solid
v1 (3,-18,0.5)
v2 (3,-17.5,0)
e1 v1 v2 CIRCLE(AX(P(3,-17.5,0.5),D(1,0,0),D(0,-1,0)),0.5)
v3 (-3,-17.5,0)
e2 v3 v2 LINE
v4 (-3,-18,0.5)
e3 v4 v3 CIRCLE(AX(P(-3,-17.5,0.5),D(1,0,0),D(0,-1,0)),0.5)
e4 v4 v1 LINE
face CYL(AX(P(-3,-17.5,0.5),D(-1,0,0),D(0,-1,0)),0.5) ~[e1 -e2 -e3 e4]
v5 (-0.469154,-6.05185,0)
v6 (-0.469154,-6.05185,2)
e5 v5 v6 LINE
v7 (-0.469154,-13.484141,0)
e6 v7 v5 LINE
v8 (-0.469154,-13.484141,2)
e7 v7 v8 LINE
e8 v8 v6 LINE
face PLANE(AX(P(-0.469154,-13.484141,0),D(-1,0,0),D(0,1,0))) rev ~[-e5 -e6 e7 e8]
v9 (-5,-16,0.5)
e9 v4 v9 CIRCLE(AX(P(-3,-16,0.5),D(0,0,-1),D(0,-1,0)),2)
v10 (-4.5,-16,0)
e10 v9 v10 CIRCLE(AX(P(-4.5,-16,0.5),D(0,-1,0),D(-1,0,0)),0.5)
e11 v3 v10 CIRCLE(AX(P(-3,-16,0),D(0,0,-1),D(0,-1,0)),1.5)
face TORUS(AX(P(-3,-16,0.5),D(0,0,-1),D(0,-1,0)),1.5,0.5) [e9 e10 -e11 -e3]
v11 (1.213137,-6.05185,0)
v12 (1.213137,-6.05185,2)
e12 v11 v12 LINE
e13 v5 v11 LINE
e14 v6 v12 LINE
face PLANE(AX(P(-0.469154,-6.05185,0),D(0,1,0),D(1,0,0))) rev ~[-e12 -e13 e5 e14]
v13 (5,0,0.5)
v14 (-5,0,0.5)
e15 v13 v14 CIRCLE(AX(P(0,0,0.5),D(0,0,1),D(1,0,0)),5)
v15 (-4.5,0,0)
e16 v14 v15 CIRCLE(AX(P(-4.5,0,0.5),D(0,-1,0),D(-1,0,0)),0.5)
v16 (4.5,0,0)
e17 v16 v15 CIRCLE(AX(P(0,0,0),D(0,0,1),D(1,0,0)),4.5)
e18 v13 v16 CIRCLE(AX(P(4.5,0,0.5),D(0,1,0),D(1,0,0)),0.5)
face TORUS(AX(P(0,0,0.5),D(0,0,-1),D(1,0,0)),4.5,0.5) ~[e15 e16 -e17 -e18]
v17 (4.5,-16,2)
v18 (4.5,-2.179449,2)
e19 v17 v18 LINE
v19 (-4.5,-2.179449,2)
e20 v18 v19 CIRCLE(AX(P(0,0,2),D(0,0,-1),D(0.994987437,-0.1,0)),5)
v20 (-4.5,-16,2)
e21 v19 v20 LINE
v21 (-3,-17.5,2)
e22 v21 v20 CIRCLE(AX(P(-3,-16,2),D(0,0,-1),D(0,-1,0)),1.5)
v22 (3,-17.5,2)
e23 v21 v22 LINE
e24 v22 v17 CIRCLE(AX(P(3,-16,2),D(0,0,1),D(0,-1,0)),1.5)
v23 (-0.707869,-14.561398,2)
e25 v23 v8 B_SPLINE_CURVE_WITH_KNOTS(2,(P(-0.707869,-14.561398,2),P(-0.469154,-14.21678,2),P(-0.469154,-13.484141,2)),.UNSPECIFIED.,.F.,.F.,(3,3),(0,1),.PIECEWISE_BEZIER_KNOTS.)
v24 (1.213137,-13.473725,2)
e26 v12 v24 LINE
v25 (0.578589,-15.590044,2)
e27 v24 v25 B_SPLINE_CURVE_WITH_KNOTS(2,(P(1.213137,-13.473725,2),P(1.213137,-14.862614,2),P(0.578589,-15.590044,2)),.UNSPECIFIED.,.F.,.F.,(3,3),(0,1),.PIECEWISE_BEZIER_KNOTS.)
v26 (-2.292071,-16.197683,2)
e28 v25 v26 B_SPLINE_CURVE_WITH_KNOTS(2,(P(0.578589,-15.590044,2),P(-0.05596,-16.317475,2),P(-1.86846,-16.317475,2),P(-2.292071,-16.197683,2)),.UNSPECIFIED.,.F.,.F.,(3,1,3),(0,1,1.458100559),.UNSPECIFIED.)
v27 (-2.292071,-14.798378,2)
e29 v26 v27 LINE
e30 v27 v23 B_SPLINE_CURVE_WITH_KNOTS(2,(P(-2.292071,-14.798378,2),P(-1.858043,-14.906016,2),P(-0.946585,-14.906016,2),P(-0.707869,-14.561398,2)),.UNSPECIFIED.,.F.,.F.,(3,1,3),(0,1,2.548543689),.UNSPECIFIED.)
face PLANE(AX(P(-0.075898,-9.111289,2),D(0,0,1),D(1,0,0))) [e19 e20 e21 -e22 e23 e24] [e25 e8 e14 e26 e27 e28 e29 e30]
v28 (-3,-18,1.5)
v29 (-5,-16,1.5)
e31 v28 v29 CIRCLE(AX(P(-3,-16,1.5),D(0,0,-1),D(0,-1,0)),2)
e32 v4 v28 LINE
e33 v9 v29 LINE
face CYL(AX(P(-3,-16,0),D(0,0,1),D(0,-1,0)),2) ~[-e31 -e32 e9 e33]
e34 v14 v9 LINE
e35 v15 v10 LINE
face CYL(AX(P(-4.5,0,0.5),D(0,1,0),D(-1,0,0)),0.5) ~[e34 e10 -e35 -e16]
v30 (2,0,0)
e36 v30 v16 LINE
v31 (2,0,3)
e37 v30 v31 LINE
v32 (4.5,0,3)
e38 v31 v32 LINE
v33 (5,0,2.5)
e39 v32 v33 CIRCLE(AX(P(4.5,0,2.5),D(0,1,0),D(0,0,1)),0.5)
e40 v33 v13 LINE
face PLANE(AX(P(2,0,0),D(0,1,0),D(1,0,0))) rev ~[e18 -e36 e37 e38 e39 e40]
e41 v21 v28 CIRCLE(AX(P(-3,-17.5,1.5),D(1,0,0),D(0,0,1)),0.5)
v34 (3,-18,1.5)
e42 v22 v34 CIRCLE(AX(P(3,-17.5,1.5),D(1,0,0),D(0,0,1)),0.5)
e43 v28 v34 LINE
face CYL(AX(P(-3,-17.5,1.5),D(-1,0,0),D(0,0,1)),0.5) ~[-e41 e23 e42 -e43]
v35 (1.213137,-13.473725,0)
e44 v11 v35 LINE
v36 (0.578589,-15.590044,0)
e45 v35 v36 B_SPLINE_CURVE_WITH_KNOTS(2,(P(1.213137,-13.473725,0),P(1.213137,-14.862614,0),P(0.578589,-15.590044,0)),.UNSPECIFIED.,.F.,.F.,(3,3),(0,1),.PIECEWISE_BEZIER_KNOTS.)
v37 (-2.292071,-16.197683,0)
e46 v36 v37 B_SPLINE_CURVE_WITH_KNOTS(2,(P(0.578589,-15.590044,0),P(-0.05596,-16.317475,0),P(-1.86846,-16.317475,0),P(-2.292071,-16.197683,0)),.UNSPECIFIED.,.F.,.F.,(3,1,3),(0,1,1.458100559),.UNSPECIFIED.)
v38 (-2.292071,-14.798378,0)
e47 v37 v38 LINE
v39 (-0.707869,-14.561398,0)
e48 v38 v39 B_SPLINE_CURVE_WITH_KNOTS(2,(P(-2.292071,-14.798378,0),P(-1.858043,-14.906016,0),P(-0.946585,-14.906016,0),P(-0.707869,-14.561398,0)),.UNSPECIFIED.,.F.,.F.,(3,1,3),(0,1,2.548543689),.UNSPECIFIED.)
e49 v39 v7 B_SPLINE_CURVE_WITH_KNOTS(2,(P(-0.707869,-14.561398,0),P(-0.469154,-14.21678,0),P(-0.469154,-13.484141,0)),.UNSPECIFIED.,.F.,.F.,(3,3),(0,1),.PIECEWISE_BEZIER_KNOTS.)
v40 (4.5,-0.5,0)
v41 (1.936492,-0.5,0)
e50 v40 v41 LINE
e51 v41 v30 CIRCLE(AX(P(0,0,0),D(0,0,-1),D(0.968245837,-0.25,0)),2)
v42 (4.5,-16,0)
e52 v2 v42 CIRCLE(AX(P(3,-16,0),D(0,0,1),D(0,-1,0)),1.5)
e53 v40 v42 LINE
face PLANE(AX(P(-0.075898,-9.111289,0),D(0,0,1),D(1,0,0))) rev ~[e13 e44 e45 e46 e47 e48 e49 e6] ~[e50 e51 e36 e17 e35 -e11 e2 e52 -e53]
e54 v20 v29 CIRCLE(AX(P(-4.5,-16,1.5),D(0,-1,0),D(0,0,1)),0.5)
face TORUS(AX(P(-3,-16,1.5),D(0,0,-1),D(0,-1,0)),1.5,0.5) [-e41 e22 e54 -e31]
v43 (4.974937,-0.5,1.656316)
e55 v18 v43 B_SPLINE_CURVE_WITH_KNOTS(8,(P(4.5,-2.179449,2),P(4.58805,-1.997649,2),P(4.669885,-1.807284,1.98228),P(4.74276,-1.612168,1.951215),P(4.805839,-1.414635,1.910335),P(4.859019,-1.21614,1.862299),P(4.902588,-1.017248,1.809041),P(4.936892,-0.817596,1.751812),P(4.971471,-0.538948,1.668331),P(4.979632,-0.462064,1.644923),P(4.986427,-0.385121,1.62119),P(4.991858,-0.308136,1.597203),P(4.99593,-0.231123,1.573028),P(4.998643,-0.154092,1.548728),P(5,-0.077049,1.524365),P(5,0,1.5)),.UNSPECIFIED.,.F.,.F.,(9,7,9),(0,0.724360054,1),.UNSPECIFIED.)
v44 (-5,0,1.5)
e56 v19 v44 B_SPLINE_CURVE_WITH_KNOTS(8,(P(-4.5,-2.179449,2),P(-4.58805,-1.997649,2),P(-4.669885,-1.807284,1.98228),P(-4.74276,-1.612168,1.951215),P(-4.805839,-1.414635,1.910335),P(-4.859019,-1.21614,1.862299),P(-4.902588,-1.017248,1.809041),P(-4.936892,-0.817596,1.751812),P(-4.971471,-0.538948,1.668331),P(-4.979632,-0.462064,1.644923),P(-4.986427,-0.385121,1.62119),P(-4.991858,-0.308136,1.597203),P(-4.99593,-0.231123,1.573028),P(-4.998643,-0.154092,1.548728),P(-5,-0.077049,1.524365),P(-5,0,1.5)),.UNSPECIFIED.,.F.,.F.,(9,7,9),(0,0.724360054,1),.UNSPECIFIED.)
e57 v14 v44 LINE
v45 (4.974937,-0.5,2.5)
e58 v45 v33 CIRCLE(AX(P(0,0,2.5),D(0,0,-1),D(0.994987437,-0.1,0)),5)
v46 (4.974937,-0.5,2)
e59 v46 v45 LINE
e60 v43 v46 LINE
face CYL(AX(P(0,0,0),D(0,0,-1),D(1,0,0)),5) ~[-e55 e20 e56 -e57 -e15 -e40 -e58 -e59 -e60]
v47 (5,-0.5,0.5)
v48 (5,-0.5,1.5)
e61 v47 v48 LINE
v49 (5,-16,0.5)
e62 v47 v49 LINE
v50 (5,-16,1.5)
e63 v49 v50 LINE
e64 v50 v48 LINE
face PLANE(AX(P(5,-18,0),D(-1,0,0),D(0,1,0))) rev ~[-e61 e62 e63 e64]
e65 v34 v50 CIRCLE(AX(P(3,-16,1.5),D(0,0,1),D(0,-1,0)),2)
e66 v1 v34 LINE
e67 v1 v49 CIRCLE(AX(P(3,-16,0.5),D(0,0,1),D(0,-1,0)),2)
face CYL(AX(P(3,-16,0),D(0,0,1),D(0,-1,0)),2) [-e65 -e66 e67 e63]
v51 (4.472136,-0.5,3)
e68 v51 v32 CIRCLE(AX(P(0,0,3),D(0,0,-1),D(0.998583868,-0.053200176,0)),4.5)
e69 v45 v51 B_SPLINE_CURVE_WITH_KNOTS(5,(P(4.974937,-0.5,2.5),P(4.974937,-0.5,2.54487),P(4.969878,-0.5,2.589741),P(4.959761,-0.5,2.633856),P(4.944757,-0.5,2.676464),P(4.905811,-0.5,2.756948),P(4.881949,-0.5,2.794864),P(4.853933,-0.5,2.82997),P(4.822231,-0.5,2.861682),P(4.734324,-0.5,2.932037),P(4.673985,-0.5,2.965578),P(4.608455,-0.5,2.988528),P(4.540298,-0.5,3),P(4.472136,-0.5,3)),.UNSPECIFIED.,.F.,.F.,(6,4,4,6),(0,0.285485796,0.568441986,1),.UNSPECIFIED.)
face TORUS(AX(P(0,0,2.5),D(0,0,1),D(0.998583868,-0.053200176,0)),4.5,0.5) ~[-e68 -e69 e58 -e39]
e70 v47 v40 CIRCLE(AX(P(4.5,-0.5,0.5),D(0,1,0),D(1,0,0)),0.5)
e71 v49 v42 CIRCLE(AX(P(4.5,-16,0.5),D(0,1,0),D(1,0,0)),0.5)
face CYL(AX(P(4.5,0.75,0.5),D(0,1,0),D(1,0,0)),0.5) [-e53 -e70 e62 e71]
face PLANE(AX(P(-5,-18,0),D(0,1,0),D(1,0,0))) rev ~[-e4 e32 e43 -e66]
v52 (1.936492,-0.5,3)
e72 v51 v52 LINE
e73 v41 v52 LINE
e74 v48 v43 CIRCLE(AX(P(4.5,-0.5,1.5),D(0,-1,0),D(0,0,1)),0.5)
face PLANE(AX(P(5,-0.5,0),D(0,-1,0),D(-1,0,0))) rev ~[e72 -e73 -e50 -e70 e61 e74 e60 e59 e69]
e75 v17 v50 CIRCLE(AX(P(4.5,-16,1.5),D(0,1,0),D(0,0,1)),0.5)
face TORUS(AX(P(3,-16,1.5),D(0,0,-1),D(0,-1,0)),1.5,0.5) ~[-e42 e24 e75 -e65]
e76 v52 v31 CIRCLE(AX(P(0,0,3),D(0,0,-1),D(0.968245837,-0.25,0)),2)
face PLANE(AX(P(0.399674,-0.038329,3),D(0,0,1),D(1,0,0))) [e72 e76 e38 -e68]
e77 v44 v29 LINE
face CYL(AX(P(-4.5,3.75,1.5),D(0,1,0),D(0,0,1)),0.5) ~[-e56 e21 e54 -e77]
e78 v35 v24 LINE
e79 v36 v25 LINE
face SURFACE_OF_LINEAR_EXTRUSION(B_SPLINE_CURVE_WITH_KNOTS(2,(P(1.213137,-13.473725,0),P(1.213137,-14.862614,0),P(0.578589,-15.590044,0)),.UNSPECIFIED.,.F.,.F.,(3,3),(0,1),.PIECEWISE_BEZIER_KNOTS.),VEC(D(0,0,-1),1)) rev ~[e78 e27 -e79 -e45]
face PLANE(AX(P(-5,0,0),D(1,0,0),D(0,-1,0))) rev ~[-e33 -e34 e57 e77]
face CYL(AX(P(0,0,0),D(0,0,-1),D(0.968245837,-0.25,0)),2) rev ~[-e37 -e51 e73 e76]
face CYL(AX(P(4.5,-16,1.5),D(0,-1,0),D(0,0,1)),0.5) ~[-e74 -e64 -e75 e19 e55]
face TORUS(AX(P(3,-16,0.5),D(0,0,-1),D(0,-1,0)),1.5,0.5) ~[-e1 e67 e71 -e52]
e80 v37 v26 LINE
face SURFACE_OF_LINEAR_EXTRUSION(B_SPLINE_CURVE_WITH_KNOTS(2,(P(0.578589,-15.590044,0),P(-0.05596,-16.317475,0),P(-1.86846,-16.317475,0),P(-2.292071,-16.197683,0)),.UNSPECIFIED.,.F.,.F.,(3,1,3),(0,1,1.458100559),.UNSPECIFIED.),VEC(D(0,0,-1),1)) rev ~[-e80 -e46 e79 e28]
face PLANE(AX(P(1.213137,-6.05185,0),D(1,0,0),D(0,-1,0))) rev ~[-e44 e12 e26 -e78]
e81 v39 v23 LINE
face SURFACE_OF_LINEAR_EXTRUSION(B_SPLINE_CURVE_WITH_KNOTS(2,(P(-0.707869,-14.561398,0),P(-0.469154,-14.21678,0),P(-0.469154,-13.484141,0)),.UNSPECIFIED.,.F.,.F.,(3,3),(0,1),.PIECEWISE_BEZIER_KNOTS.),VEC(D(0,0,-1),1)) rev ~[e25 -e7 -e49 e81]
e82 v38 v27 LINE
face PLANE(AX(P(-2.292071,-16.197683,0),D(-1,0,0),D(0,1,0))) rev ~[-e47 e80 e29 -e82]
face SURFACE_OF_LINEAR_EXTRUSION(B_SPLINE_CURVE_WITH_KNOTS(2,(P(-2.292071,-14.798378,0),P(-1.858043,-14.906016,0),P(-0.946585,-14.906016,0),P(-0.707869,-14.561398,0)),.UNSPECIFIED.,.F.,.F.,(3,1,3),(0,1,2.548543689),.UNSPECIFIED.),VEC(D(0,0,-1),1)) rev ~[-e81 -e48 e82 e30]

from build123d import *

# Parameters (mm, degrees)
F1_DEPTH     = 3
F2_DEPTH     = 2
F3_R         = 2
F4_T1_DEPTH  = 16.75
F4_T3_DEPTH  = 6
F4_T5_DEPTH  = 16
F4_T10_DEPTH = 16.75
F4_S11_R     = 5
F4_T12_DEPTH = 10
F4_T14_ANGLE = 359.64
F4_T18_DEPTH = 19.75
F4_S19_R     = 5
F4_T20_DEPTH = 11
F4_T22_ANGLE = 90
F4_T24_ANGLE = 90
F4_T26_ANGLE = 90
F4_T28_ANGLE = 180
F4_T30_ANGLE = 90


# Not quite as in the source:
# - a fillet or chamfer that OpenCascade refuses, or shapes differently, is made with other operations: its cross-section is extruded or revolved along the edge and cut away or added


with BuildPart() as f1:
    # F0 (on Top) → F1 (new body)
    with BuildSketch(Plane.XY):
        with BuildLine():
            Line((2, 0), (5, 0))
            ThreePointArc((5, 0), (0, 5), (-5, 0))
            ThreePointArc((-5, 0), (-0.2503138753, -4.9937303656), (4.9749371855, -0.5))
            Line((4.9749371855, -0.5), (1.9364916731, -0.5))
            ThreePointArc((1.9364916731, -0.5), (-1.9840593925, 0.252008585), (2, 0))
        make_face()
    extrude(amount=F1_DEPTH)

    # F0 (on Top) → F2 (join)
    with BuildSketch(Plane.XY):
        with BuildLine():
            ThreePointArc((4.9749371855, -0.5), (-0.2503138753, -4.9937303656), (-5, 0))
            Line((-5, 0), (-5, -18))
            Line((-5, -18), (5, -18))
            Line((5, -18), (5, -0.5))
            Line((5, -0.5), (4.9749371855, -0.5))
        make_face()
        with BuildLine():
            add(Edge.make_bspline(
                [(0.578588878, -15.5900442691), (-0.0559597331, -16.3174748247), (-1.2990152887, -16.3174748247)],
                knots=[0, 0, 0, 1, 1, 1], degree=2))
            add(Edge.make_bspline(
                [(-1.2990152887, -16.3174748247), (-1.8684597331, -16.3174748247), (-2.2920708442, -16.197683158)],
                knots=[0, 0, 0, 1, 1, 1], degree=2))
            Line((-2.2920708442, -16.197683158), (-2.2920708442, -14.7983776025))
            add(Edge.make_bspline(
                [(-2.2920708442, -14.7983776025), (-1.8580430665, -14.9060164914), (-1.5004041776, -14.9060164914)],
                knots=[0, 0, 0, 1, 1, 1], degree=2))
            add(Edge.make_bspline(
                [(-1.5004041776, -14.9060164914), (-0.9465847331, -14.9060164914), (-0.7078694553, -14.5613984358)],
                knots=[0, 0, 0, 1, 1, 1], degree=2))
            add(Edge.make_bspline(
                [(-0.7078694553, -14.5613984358), (-0.4691541776, -14.2167803802), (-0.4691541776, -13.4841414914)],
                knots=[0, 0, 0, 1, 1, 1], degree=2))
            Line((-0.4691541776, -13.4841414914), (-0.4691541776, -6.0518498247))
            Line((-0.4691541776, -6.0518498247), (1.2131374891, -6.0518498247))
            Line((1.2131374891, -6.0518498247), (1.2131374891, -13.4737248247))
            add(Edge.make_bspline(
                [(1.2131374891, -13.4737248247), (1.2131374891, -14.8626137136), (0.578588878, -15.5900442691)],
                knots=[0, 0, 0, 1, 1, 1], degree=2))
        make_face(mode=Mode.SUBTRACT)
    extrude(amount=F2_DEPTH)

    # F3
    f3_edges = [f1.edges().sort_by_distance(p)[0] for p in [
        (-5, -18, 1),
        (5, -18, 1),
    ]]
    fillet(f3_edges, radius=F3_R)

    # F4: fillet of radius 0.5 on 12 edges, made by hand

    # F4_s2 → F4_t1 (cut)
    with BuildSketch(Plane.XZ.offset(-0.75)):
        with BuildLine():
            ThreePointArc((5, 0.5), (4.8535533906, 0.1464466094), (4.5, 0))
            Line((4.5, 0), (5, 0))
            Line((5, 0), (5, 0.5))
        make_face()
    extrude(amount=F4_T1_DEPTH, mode=Mode.SUBTRACT)

    # F4_s4 → F4_t3 (cut)
    with BuildSketch(Plane.YZ.offset(-3)):
        with BuildLine():
            ThreePointArc((-17.5, 2), (-17.8535533906, 1.8535533906), (-18, 1.5))
            Line((-18, 1.5), (-18, 2))
            Line((-18, 2), (-17.5, 2))
        make_face()
        with BuildLine():
            ThreePointArc((-18, 0.5), (-17.8535533906, 0.1464466094), (-17.5, 0))
            Line((-17.5, 0), (-18, 0))
            Line((-18, 0), (-18, 0.5))
        make_face()
    extrude(amount=F4_T3_DEPTH, mode=Mode.SUBTRACT)

    # F4_s6 → F4_t5 (cut)
    with BuildSketch(Plane.XZ):
        with BuildLine():
            ThreePointArc((-5, 0.5), (-4.8535533906, 0.1464466094), (-4.5, 0))
            Line((-4.5, 0), (-5, 0))
            Line((-5, 0), (-5, 0.5))
        make_face()
    extrude(amount=F4_T5_DEPTH, mode=Mode.SUBTRACT)


with BuildPart() as f4_tool8:
    # F4_s9 → F4_t10 (new body)
    with BuildSketch(Plane.XZ.offset(16)):
        with BuildLine():
            ThreePointArc((4.5, 2), (4.8535533906, 1.8535533906), (5, 1.5))
            Line((5, 1.5), (5, 2))
            Line((5, 2), (4.5, 2))
        make_face()
    extrude(amount=-F4_T10_DEPTH)

    # F4_s11 → F4_t12 (cut, symmetric)
    with BuildSketch(Plane.XY.offset(1.8)):
        Circle(F4_S11_R)
    extrude(amount=F4_T12_DEPTH, both=True, mode=Mode.SUBTRACT)


with BuildPart() as f1_1:
    add(f1.part)

    # F4_t7: cut F4_tool8
    add(f4_tool8.part, mode=Mode.SUBTRACT)

    # F4_s13 → F4_t14 (revolve, cut)
    with BuildSketch(Plane(origin=(0, 0, 0), x_dir=(0, 0, 1), z_dir=(0.0532001762, 0.9985838679, 0))):
        with BuildLine():
            ThreePointArc((2.5, 5), (2.8535533906, 4.8535533906), (3, 4.5))
            Line((3, 4.5), (3, 5))
            Line((3, 5), (2.5, 5))
        make_face()
    revolve(axis=Axis((0, 0, 3), (0, 0, -1)), revolution_arc=F4_T14_ANGLE, mode=Mode.SUBTRACT)


with BuildPart() as f4_tool16:
    # F4_s17 → F4_t18 (new body)
    with BuildSketch(Plane.XZ.offset(-3.75)):
        with BuildLine():
            ThreePointArc((-4.5, 2), (-4.8535533906, 1.8535533906), (-5, 1.5))
            Line((-5, 1.5), (-5, 2))
            Line((-5, 2), (-4.5, 2))
        make_face()
    extrude(amount=F4_T18_DEPTH)

    # F4_s19 → F4_t20 (cut, symmetric)
    with BuildSketch(Plane.XY.offset(1.8)):
        Circle(F4_S19_R)
    extrude(amount=F4_T20_DEPTH, both=True, mode=Mode.SUBTRACT)


with BuildPart() as f1_2:
    add(f1_1.part)

    # F4_t15: cut F4_tool16
    add(f4_tool16.part, mode=Mode.SUBTRACT)

    # F4_s21 → F4_t22 (revolve, cut)
    with BuildSketch(Plane.YZ.offset(-3)):
        with BuildLine():
            ThreePointArc((-17.5, 2), (-17.8535533906, 1.8535533906), (-18, 1.5))
            Line((-18, 1.5), (-18, 2))
            Line((-18, 2), (-17.5, 2))
        make_face()
    revolve(axis=Axis((-3, -16, 2), (0, 0, -1)), revolution_arc=F4_T22_ANGLE, mode=Mode.SUBTRACT)

    # F4_s23 → F4_t24 (revolve, cut)
    with BuildSketch(Plane.YZ.offset(3)):
        with BuildLine():
            ThreePointArc((-17.5, 2), (-17.8535533906, 1.8535533906), (-18, 1.5))
            Line((-18, 1.5), (-18, 2))
            Line((-18, 2), (-17.5, 2))
        make_face()
    revolve(axis=Axis((3, -16, 2), (0, 0, 1)), revolution_arc=F4_T24_ANGLE, mode=Mode.SUBTRACT)

    # F4_s25 → F4_t26 (revolve, cut)
    with BuildSketch(Plane.YZ.offset(-3)):
        with BuildLine():
            ThreePointArc((-18, 0.5), (-17.8535533906, 0.1464466094), (-17.5, 0))
            Line((-17.5, 0), (-18, 0))
            Line((-18, 0), (-18, 0.5))
        make_face()
    revolve(axis=Axis((-3, -16, 0), (0, 0, -1)), revolution_arc=F4_T26_ANGLE, mode=Mode.SUBTRACT)

    # F4_s27 → F4_t28 (revolve, cut)
    with BuildSketch(Plane.XZ):
        with BuildLine():
            ThreePointArc((5, 0.5), (4.8535533906, 0.1464466094), (4.5, 0))
            Line((4.5, 0), (5, 0))
            Line((5, 0), (5, 0.5))
        make_face()
    revolve(axis=Axis((0, 0, 0), (0, 0, 1)), revolution_arc=F4_T28_ANGLE, mode=Mode.SUBTRACT)

    # F4_s29 → F4_t30 (revolve, cut)
    with BuildSketch(Plane.YZ.offset(3)):
        with BuildLine():
            ThreePointArc((-18, 0.5), (-17.8535533906, 0.1464466094), (-17.5, 0))
            Line((-17.5, 0), (-18, 0))
            Line((-18, 0), (-18, 0.5))
        make_face()
    revolve(axis=Axis((3, -16, 0), (0, 0, 1)), revolution_arc=F4_T30_ANGLE, mode=Mode.SUBTRACT)


solid = f1_2.part
